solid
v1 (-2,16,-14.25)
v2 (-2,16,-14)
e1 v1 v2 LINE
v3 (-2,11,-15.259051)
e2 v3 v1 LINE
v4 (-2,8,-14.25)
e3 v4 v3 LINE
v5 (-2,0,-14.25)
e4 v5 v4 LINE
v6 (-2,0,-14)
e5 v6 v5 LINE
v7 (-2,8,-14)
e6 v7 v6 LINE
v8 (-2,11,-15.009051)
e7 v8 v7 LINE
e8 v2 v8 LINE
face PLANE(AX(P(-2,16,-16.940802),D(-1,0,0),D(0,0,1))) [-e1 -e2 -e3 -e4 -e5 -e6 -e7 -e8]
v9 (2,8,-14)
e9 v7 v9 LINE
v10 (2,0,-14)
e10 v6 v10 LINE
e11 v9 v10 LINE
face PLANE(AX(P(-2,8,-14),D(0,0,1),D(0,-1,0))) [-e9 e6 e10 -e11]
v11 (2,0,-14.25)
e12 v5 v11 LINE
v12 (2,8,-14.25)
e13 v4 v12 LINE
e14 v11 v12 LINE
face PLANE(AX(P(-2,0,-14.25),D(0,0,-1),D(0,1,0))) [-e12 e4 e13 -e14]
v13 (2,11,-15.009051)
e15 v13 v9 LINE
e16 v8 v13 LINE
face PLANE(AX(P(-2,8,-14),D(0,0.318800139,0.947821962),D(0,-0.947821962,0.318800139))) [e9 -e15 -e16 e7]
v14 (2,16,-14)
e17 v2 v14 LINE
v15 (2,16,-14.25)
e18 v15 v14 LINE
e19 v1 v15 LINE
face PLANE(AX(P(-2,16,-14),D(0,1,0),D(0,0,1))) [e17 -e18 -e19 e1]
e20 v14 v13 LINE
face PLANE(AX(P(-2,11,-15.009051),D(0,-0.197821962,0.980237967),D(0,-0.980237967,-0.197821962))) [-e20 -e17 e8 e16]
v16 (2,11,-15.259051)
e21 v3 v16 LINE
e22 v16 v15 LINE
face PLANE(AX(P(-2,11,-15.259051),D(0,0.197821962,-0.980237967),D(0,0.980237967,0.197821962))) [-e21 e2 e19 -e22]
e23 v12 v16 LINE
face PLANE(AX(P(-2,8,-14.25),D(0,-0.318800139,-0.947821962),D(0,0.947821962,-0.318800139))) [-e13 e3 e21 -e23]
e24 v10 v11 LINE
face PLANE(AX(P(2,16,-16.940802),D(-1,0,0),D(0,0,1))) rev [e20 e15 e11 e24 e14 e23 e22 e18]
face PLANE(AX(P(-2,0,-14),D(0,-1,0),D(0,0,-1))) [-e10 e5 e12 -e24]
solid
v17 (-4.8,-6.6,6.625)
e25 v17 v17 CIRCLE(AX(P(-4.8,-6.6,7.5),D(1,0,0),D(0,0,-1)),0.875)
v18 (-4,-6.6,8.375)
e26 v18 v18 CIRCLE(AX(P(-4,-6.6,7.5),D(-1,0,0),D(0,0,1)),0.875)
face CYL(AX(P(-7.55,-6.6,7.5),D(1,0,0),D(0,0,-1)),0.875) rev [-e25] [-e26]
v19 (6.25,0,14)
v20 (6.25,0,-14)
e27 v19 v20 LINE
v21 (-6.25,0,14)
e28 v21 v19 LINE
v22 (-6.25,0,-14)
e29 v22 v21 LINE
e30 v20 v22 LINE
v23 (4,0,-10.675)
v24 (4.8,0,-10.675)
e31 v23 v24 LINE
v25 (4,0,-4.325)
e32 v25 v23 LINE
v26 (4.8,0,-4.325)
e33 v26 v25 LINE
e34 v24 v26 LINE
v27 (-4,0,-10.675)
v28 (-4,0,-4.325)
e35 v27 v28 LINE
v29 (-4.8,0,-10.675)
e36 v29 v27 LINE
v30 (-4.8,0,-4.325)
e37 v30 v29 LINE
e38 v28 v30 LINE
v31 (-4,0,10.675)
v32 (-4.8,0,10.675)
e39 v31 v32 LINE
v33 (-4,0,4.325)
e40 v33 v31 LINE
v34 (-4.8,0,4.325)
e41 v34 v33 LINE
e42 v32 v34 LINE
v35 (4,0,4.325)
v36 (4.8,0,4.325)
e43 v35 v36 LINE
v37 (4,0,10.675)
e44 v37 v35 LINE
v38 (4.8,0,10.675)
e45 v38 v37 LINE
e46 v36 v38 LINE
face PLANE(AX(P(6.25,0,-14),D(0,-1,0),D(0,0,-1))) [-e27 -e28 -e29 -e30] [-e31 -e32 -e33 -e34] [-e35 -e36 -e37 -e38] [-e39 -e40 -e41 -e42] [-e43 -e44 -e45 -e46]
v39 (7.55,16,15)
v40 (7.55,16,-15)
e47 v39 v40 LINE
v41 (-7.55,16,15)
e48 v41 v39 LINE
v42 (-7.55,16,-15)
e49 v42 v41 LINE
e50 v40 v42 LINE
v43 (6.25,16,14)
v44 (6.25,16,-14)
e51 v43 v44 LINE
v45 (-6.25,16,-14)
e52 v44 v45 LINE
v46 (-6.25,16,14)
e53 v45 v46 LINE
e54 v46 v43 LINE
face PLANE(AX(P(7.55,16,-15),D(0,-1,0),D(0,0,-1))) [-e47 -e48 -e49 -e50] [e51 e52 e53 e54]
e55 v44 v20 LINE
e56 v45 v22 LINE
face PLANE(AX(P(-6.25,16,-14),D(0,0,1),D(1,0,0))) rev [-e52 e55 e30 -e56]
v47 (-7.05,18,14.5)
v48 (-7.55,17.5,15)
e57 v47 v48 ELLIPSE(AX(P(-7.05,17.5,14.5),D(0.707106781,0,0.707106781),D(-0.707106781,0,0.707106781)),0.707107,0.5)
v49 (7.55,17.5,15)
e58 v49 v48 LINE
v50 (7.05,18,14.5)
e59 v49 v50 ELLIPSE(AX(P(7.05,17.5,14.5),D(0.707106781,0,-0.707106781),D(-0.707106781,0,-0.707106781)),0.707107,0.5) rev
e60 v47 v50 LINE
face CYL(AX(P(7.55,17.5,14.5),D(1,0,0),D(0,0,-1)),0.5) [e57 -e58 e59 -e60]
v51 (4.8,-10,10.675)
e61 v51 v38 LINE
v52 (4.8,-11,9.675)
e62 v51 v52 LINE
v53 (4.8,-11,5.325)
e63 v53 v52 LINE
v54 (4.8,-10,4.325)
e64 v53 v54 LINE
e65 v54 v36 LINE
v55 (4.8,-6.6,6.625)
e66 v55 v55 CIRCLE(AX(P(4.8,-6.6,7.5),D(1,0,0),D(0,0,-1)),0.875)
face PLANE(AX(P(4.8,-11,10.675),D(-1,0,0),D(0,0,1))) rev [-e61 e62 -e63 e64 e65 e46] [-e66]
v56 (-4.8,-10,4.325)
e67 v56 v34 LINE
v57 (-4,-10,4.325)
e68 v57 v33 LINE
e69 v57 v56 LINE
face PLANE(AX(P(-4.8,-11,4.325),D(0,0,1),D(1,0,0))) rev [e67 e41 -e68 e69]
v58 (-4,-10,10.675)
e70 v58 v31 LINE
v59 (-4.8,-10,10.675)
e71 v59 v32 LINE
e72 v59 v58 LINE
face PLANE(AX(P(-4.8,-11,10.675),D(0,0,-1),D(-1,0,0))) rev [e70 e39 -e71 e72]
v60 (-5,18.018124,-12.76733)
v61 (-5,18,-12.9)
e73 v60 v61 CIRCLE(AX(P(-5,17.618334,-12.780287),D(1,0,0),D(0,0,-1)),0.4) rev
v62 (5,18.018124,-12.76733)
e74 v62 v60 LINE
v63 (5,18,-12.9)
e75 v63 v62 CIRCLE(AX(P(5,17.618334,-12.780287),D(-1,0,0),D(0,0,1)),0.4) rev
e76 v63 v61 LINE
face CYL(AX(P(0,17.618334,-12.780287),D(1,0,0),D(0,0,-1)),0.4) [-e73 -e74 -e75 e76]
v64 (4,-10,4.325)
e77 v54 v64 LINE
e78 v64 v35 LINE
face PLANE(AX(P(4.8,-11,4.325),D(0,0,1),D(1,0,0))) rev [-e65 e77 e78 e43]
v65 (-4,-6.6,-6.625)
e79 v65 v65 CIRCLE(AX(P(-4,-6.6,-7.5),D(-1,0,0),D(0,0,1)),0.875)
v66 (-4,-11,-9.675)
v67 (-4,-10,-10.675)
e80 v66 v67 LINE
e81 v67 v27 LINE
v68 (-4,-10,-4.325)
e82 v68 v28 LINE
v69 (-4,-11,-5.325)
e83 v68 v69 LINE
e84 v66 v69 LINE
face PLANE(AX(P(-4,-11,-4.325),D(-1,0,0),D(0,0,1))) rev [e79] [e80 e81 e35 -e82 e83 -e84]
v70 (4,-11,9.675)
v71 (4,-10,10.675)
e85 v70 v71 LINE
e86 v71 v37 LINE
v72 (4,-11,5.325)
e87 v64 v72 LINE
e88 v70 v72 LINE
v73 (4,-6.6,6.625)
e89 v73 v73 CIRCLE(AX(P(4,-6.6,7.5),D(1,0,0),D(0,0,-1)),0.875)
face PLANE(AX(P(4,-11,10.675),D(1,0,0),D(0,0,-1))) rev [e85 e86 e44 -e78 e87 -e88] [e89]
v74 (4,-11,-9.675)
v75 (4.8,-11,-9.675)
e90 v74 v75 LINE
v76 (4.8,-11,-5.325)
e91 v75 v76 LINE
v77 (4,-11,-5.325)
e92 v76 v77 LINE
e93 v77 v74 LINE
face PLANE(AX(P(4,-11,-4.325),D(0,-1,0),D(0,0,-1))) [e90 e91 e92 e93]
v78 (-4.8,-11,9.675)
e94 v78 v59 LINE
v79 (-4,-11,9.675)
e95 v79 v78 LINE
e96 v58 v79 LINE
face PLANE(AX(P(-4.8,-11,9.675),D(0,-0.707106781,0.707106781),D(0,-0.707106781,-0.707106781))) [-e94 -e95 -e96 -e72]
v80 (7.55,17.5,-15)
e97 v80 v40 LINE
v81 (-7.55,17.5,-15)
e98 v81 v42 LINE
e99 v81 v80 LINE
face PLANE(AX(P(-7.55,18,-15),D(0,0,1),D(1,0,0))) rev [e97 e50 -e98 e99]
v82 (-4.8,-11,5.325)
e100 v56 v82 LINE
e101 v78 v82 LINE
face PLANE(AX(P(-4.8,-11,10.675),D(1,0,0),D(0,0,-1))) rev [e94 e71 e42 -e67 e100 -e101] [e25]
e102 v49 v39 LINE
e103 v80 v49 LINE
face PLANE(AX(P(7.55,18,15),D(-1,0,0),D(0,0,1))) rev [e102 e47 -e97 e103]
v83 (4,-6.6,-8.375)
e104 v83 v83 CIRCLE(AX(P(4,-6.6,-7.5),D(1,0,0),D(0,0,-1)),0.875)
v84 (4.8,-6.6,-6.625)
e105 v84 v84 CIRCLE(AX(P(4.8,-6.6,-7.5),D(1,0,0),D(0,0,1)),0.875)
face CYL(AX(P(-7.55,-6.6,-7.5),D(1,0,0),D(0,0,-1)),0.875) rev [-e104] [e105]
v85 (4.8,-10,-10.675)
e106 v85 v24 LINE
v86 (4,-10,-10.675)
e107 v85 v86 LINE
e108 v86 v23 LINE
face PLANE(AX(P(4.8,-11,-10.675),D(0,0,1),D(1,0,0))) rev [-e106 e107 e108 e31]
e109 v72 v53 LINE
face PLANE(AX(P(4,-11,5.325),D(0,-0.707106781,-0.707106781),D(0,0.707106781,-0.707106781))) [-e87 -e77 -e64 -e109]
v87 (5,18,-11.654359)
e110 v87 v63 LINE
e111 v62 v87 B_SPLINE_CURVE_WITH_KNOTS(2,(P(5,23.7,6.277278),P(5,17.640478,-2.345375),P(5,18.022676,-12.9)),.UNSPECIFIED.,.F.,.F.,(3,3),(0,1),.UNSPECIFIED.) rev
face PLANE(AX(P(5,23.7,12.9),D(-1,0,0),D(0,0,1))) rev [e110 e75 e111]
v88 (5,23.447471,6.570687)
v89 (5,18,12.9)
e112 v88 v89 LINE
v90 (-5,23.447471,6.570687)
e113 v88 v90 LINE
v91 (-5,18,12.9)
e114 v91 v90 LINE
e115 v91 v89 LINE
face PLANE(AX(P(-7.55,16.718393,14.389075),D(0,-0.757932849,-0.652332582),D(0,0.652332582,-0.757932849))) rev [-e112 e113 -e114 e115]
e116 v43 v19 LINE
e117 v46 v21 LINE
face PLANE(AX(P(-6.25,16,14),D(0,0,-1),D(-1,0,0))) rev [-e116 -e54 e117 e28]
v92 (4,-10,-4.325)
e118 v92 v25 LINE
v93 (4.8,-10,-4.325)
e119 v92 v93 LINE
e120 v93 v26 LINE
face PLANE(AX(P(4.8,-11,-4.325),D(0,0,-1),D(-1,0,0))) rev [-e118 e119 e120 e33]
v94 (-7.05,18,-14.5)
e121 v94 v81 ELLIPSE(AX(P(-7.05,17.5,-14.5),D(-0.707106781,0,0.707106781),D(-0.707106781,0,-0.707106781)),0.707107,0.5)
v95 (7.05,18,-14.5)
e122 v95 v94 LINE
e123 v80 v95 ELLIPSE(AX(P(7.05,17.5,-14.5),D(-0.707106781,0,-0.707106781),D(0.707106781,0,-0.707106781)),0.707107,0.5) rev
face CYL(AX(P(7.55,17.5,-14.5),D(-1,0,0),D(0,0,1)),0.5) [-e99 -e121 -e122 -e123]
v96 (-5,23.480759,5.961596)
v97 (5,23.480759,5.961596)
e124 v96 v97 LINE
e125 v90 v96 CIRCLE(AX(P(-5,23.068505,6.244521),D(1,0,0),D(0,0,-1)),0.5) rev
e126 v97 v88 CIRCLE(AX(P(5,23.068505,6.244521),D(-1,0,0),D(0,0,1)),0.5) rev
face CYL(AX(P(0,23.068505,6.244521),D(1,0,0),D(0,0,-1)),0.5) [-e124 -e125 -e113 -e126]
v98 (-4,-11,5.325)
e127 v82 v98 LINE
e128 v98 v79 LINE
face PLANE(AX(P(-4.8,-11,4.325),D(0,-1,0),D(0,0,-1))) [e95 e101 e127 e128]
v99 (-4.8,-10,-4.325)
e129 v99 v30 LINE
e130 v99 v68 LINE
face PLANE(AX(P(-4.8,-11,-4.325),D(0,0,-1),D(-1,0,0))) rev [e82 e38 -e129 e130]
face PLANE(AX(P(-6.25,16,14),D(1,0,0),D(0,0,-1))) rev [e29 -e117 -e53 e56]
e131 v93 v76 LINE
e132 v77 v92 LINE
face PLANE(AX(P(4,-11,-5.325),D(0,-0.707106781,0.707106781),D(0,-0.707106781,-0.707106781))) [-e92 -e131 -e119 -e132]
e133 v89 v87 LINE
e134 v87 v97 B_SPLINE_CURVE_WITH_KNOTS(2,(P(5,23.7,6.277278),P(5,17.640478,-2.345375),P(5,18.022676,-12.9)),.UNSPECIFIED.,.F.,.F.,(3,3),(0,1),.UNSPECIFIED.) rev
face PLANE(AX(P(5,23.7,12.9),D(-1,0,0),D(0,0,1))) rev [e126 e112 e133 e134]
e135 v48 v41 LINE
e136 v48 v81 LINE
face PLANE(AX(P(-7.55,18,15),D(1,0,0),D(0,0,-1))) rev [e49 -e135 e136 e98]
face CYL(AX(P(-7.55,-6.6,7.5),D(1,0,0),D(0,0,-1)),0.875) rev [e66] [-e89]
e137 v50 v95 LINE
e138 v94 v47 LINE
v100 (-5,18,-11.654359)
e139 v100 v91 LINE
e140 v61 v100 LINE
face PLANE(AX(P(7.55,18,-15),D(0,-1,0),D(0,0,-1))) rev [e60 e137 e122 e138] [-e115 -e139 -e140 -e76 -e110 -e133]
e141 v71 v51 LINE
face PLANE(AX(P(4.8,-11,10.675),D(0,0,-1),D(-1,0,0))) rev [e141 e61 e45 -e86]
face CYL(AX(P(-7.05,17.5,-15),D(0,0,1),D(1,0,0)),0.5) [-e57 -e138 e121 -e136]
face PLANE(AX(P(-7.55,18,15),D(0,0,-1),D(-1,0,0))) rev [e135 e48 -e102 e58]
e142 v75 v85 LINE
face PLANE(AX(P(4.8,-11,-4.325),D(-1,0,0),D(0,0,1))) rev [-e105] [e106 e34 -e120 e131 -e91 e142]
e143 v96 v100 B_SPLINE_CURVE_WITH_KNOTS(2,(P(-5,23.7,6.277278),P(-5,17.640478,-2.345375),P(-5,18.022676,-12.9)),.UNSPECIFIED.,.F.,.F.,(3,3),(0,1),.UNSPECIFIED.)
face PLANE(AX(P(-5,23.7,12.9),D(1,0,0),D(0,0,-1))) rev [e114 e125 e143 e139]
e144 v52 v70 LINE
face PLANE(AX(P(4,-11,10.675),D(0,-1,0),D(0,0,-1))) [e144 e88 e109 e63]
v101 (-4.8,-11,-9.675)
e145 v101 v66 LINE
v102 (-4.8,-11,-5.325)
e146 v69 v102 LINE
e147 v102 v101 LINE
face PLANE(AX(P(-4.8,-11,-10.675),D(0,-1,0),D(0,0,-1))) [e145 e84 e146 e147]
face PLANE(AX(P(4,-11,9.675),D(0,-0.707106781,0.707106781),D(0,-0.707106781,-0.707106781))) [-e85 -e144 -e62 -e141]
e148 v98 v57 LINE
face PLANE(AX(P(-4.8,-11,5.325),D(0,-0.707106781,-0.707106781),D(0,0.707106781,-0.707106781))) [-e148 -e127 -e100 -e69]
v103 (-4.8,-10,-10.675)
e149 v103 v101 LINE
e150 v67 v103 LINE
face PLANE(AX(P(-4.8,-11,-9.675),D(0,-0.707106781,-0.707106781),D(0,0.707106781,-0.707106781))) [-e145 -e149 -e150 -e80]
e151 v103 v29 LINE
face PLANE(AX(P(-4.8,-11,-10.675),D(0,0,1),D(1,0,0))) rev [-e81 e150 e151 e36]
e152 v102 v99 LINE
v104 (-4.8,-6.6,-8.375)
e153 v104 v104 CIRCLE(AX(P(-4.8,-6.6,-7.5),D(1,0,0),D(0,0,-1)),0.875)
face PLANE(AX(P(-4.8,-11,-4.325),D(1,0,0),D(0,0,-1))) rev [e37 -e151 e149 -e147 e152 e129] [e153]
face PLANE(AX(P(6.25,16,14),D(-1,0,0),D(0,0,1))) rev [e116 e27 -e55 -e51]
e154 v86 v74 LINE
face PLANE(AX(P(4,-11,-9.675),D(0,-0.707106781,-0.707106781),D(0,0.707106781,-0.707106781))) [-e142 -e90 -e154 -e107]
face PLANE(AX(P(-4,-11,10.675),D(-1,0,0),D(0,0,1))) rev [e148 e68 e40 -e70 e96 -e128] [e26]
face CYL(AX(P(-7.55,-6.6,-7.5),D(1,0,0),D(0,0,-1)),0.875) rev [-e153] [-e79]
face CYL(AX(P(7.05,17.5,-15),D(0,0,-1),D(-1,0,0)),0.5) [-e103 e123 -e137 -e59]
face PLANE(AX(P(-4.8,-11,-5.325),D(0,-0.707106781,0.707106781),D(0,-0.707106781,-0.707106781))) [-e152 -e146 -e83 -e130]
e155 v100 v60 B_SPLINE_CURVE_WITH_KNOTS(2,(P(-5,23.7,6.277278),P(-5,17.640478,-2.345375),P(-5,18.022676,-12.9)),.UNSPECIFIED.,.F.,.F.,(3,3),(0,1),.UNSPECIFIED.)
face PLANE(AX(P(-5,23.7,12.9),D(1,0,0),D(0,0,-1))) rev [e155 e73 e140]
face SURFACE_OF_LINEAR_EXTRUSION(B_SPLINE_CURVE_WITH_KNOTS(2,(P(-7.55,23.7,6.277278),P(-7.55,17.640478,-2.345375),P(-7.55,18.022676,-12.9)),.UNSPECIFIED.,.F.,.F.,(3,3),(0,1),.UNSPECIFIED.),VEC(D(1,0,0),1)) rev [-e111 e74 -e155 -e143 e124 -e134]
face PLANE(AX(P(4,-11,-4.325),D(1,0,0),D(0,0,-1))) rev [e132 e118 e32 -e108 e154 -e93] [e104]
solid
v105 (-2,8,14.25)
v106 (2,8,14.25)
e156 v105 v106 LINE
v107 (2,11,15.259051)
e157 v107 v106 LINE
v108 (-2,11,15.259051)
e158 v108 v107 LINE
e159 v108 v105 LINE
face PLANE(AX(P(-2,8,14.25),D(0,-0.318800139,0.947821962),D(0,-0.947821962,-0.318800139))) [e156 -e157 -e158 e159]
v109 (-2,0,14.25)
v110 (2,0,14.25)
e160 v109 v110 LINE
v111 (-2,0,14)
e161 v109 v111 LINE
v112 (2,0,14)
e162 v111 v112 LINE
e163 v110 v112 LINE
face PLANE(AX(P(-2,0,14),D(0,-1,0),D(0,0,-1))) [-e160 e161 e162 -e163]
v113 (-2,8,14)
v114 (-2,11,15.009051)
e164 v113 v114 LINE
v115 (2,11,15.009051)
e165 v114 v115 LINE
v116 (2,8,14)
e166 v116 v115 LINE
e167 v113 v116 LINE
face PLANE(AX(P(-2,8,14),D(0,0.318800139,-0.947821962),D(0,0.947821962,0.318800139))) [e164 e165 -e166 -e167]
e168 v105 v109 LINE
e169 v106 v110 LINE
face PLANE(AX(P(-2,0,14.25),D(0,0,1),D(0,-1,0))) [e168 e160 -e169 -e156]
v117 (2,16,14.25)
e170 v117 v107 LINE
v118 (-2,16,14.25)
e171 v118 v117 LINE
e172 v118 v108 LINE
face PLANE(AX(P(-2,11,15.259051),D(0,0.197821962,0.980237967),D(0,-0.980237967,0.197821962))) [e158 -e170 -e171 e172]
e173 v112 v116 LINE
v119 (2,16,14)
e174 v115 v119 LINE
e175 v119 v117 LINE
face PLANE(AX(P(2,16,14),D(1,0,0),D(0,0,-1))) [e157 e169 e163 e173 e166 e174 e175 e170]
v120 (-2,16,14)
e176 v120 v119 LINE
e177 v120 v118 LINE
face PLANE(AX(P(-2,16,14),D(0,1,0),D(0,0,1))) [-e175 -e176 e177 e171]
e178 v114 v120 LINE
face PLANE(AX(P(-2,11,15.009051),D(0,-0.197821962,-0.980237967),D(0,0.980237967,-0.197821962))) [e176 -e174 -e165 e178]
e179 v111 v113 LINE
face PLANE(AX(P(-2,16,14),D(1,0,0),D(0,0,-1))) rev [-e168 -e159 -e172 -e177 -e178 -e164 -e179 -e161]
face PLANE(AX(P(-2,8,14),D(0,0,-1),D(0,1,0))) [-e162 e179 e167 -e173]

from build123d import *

# Parameters (mm, degrees)
SKETCH1_W                  = 12.5
SKETCH1_H                  = 28
BOSS_EXTRUDE1_DEPTH        = 16
SKETCH2_W                  = 15.1
SKETCH2_H                  = 30
BOSS_EXTRUDE2_DEPTH        = 2
FILLET1_R                  = 0.5
SKETCH3_W                  = 10
SKETCH3_H                  = 25.8
BOSS_EXTRUDE3_DEPTH        = 5.7
CUT_EXTRUDE1_DEPTH         = 31.727715502
CUT_EXTRUDE1_DEPTH_BACK    = 31.727715502
FILLET2_R                  = 0.5
FILLET3_R                  = 0.4
BOSS_EXTRUDE4_DEPTH        = 2
BOSS_EXTRUDE4_DEPTH_BACK   = 2
BOSS_EXTRUDE4_2_DEPTH      = 2
BOSS_EXTRUDE4_2_DEPTH_BACK = 2
SKETCH9_W                  = 0.8
SKETCH9_H                  = 6.35
BOSS_EXTRUDE5_DEPTH        = 11
CHAMFER1_SIZE              = 1
SKETCH10_R                 = 0.875
CUT_EXTRUDE2_DEPTH         = 31.673042539


with BuildPart() as part:
    # Sketch1 → Boss-Extrude1 (new body)
    with BuildSketch(Plane(origin=(0, 0, 0), x_dir=(1, 0, 0), z_dir=(0, 1, 0))):
        Rectangle(SKETCH1_W, SKETCH1_H)
    extrude(amount=BOSS_EXTRUDE1_DEPTH)

    # Sketch2 → Boss-Extrude2 (add)
    with BuildSketch(Plane(origin=(0, 16, 0), x_dir=(1, 0, 0), z_dir=(0, 1, 0))):
        Rectangle(SKETCH2_W, SKETCH2_H)
    extrude(amount=BOSS_EXTRUDE2_DEPTH)

    # Fillet1
    fillet1_edges = [part.edges().sort_by_distance(p)[0] for p in [
        (7.55, 18, 0),
        (0, 18, -15),
        (-7.55, 18, 0),
        (0, 18, 15),
    ]]
    fillet(fillet1_edges, radius=FILLET1_R)

    # Sketch3 → Boss-Extrude3 (add)
    with BuildSketch(Plane(origin=(0, 18, 0), x_dir=(1, 0, 0), z_dir=(0, 1, 0))):
        Rectangle(SKETCH3_W, SKETCH3_H)
    extrude(amount=BOSS_EXTRUDE3_DEPTH)

    # Sketch4 → Cut-Extrude1 (cut, two sides: drawn at the far end of the back side and taken through both)
    with BuildSketch(Plane(origin=(5, 0, 0), x_dir=(0, 0, -1), z_dir=(1, 0, 0)).offset(-CUT_EXTRUDE1_DEPTH_BACK)):
        Polygon((-12.9, 23.7), (-12.9, 18), (-6.277278159, 23.7), align=None)
        with BuildLine():
            Line((12.9, 23.7), (-6.277278159, 23.7))
            add(Edge.make_bspline(
                [(-6.277278159, 23.7), (2.345374626, 17.640478228), (12.9, 18.022676474)],
                knots=[0, 0, 0, 1, 1, 1], degree=2))
            Line((12.9, 18.022676474), (12.9, 23.7))
        make_face()
    extrude(amount=CUT_EXTRUDE1_DEPTH + CUT_EXTRUDE1_DEPTH_BACK, mode=Mode.SUBTRACT)

    # Fillet2
    fillet2_edges = [part.edges().sort_by_distance(p)[0] for p in [
        (0, 23.7, 6.277278159),
    ]]
    fillet(fillet2_edges, radius=FILLET2_R)

    # Fillet3
    # the kernel refuses this fillet: 0.4 mm, written as the material it takes off along each edge
    with BuildSketch(Plane(origin=(5.331871434, 18.022676474, -12.9), x_dir=(0, -0.034291988848172396, 0.9994118567942032), z_dir=(-1, 0, 0))) as fillet3_piece_1:
        with BuildLine():
            CenterArc((0.133508314, -0.399999278), FILLET3_R, 90.108824788, 19.270863365)
            Line((0.000777621, -0.022663137), (-0.001876992, -0.015116415))
            ThreePointArc((-0.001876992, -0.015116415), (-0.007606484, -0.011605905), (-0.007995295, -0.000274336))
            Line((-0.007995295, -0.000274336), (1.5175e-05, 0.007999986))
            ThreePointArc((1.5175e-05, 0.007999986), (0.066374292, 0.007937006), (0.132733379, 0.007999986))
            Line((0.132733379, 0.007999986), (0.132748574, 0))
        make_face()
    extrude(amount=10.663742869, mode=Mode.SUBTRACT)

    # Sketch9 → Boss-Extrude5 (add)
    with BuildSketch(Plane.XZ):
        with Locations((-4.4, 7.5)):
            Rectangle(SKETCH9_W, SKETCH9_H)
        with Locations((-4.4, -7.5)):
            Rectangle(SKETCH9_W, SKETCH9_H)
        with Locations((4.4, -7.5)):
            Rectangle(SKETCH9_W, SKETCH9_H)
        with Locations((4.4, 7.5)):
            Rectangle(SKETCH9_W, SKETCH9_H)
    extrude(amount=BOSS_EXTRUDE5_DEPTH)

    # Chamfer1
    chamfer1_edges = [part.edges().sort_by_distance(p)[0] for p in [
        (-4.4, -11, 4.325),
        (-4.4, -11, 10.675),
        (-4.4, -11, -10.675),
        (-4.4, -11, -4.325),
        (4.4, -11, -4.325),
        (4.4, -11, -10.675),
        (4.4, -11, 10.675),
        (4.4, -11, 4.325),
    ]]
    chamfer(chamfer1_edges, length=CHAMFER1_SIZE)

    # Sketch10 → Cut-Extrude2 (cut, through all)
    with BuildSketch(Plane(origin=(4.8, 0, 0), x_dir=(0, 0, -1), z_dir=(1, 0, 0))):
        with Locations((-7.5, -6.6)):
            Circle(SKETCH10_R)
        with Locations((7.5, -6.6)):
            Circle(SKETCH10_R)
    extrude(amount=-CUT_EXTRUDE2_DEPTH, mode=Mode.SUBTRACT)


with BuildPart() as body_2:
    # Sketch8 → Boss-Extrude4 (new, two sides: drawn at the far end of the back side and taken through both)
    with BuildSketch(Plane(origin=(0, 0, 0), x_dir=(0, 0, -1), z_dir=(1, 0, 0)).offset(-BOSS_EXTRUDE4_DEPTH_BACK)):
        Polygon((-14, 16), (-14.25, 16), (-15.259050703, 11), (-14.25, 8), (-14.25, 0), (-14, 0), (-14, 8), (-15.009050703, 11), align=None)
    extrude(amount=BOSS_EXTRUDE4_DEPTH + BOSS_EXTRUDE4_DEPTH_BACK)


with BuildPart() as body_3:
    # Sketch8 → Boss-Extrude4 2 (new, two sides: drawn at the far end of the back side and taken through both)
    with BuildSketch(Plane(origin=(0, 0, 0), x_dir=(0, 0, -1), z_dir=(1, 0, 0)).offset(-BOSS_EXTRUDE4_2_DEPTH_BACK)):
        Polygon((14.25, 0), (14.25, 8), (15.259050703, 11), (14.25, 16), (14, 16), (15.009050703, 11), (14, 8), (14, 0), align=None)
    extrude(amount=BOSS_EXTRUDE4_2_DEPTH + BOSS_EXTRUDE4_2_DEPTH_BACK)


solid = Compound([part.part, body_2.part, body_3.part])
